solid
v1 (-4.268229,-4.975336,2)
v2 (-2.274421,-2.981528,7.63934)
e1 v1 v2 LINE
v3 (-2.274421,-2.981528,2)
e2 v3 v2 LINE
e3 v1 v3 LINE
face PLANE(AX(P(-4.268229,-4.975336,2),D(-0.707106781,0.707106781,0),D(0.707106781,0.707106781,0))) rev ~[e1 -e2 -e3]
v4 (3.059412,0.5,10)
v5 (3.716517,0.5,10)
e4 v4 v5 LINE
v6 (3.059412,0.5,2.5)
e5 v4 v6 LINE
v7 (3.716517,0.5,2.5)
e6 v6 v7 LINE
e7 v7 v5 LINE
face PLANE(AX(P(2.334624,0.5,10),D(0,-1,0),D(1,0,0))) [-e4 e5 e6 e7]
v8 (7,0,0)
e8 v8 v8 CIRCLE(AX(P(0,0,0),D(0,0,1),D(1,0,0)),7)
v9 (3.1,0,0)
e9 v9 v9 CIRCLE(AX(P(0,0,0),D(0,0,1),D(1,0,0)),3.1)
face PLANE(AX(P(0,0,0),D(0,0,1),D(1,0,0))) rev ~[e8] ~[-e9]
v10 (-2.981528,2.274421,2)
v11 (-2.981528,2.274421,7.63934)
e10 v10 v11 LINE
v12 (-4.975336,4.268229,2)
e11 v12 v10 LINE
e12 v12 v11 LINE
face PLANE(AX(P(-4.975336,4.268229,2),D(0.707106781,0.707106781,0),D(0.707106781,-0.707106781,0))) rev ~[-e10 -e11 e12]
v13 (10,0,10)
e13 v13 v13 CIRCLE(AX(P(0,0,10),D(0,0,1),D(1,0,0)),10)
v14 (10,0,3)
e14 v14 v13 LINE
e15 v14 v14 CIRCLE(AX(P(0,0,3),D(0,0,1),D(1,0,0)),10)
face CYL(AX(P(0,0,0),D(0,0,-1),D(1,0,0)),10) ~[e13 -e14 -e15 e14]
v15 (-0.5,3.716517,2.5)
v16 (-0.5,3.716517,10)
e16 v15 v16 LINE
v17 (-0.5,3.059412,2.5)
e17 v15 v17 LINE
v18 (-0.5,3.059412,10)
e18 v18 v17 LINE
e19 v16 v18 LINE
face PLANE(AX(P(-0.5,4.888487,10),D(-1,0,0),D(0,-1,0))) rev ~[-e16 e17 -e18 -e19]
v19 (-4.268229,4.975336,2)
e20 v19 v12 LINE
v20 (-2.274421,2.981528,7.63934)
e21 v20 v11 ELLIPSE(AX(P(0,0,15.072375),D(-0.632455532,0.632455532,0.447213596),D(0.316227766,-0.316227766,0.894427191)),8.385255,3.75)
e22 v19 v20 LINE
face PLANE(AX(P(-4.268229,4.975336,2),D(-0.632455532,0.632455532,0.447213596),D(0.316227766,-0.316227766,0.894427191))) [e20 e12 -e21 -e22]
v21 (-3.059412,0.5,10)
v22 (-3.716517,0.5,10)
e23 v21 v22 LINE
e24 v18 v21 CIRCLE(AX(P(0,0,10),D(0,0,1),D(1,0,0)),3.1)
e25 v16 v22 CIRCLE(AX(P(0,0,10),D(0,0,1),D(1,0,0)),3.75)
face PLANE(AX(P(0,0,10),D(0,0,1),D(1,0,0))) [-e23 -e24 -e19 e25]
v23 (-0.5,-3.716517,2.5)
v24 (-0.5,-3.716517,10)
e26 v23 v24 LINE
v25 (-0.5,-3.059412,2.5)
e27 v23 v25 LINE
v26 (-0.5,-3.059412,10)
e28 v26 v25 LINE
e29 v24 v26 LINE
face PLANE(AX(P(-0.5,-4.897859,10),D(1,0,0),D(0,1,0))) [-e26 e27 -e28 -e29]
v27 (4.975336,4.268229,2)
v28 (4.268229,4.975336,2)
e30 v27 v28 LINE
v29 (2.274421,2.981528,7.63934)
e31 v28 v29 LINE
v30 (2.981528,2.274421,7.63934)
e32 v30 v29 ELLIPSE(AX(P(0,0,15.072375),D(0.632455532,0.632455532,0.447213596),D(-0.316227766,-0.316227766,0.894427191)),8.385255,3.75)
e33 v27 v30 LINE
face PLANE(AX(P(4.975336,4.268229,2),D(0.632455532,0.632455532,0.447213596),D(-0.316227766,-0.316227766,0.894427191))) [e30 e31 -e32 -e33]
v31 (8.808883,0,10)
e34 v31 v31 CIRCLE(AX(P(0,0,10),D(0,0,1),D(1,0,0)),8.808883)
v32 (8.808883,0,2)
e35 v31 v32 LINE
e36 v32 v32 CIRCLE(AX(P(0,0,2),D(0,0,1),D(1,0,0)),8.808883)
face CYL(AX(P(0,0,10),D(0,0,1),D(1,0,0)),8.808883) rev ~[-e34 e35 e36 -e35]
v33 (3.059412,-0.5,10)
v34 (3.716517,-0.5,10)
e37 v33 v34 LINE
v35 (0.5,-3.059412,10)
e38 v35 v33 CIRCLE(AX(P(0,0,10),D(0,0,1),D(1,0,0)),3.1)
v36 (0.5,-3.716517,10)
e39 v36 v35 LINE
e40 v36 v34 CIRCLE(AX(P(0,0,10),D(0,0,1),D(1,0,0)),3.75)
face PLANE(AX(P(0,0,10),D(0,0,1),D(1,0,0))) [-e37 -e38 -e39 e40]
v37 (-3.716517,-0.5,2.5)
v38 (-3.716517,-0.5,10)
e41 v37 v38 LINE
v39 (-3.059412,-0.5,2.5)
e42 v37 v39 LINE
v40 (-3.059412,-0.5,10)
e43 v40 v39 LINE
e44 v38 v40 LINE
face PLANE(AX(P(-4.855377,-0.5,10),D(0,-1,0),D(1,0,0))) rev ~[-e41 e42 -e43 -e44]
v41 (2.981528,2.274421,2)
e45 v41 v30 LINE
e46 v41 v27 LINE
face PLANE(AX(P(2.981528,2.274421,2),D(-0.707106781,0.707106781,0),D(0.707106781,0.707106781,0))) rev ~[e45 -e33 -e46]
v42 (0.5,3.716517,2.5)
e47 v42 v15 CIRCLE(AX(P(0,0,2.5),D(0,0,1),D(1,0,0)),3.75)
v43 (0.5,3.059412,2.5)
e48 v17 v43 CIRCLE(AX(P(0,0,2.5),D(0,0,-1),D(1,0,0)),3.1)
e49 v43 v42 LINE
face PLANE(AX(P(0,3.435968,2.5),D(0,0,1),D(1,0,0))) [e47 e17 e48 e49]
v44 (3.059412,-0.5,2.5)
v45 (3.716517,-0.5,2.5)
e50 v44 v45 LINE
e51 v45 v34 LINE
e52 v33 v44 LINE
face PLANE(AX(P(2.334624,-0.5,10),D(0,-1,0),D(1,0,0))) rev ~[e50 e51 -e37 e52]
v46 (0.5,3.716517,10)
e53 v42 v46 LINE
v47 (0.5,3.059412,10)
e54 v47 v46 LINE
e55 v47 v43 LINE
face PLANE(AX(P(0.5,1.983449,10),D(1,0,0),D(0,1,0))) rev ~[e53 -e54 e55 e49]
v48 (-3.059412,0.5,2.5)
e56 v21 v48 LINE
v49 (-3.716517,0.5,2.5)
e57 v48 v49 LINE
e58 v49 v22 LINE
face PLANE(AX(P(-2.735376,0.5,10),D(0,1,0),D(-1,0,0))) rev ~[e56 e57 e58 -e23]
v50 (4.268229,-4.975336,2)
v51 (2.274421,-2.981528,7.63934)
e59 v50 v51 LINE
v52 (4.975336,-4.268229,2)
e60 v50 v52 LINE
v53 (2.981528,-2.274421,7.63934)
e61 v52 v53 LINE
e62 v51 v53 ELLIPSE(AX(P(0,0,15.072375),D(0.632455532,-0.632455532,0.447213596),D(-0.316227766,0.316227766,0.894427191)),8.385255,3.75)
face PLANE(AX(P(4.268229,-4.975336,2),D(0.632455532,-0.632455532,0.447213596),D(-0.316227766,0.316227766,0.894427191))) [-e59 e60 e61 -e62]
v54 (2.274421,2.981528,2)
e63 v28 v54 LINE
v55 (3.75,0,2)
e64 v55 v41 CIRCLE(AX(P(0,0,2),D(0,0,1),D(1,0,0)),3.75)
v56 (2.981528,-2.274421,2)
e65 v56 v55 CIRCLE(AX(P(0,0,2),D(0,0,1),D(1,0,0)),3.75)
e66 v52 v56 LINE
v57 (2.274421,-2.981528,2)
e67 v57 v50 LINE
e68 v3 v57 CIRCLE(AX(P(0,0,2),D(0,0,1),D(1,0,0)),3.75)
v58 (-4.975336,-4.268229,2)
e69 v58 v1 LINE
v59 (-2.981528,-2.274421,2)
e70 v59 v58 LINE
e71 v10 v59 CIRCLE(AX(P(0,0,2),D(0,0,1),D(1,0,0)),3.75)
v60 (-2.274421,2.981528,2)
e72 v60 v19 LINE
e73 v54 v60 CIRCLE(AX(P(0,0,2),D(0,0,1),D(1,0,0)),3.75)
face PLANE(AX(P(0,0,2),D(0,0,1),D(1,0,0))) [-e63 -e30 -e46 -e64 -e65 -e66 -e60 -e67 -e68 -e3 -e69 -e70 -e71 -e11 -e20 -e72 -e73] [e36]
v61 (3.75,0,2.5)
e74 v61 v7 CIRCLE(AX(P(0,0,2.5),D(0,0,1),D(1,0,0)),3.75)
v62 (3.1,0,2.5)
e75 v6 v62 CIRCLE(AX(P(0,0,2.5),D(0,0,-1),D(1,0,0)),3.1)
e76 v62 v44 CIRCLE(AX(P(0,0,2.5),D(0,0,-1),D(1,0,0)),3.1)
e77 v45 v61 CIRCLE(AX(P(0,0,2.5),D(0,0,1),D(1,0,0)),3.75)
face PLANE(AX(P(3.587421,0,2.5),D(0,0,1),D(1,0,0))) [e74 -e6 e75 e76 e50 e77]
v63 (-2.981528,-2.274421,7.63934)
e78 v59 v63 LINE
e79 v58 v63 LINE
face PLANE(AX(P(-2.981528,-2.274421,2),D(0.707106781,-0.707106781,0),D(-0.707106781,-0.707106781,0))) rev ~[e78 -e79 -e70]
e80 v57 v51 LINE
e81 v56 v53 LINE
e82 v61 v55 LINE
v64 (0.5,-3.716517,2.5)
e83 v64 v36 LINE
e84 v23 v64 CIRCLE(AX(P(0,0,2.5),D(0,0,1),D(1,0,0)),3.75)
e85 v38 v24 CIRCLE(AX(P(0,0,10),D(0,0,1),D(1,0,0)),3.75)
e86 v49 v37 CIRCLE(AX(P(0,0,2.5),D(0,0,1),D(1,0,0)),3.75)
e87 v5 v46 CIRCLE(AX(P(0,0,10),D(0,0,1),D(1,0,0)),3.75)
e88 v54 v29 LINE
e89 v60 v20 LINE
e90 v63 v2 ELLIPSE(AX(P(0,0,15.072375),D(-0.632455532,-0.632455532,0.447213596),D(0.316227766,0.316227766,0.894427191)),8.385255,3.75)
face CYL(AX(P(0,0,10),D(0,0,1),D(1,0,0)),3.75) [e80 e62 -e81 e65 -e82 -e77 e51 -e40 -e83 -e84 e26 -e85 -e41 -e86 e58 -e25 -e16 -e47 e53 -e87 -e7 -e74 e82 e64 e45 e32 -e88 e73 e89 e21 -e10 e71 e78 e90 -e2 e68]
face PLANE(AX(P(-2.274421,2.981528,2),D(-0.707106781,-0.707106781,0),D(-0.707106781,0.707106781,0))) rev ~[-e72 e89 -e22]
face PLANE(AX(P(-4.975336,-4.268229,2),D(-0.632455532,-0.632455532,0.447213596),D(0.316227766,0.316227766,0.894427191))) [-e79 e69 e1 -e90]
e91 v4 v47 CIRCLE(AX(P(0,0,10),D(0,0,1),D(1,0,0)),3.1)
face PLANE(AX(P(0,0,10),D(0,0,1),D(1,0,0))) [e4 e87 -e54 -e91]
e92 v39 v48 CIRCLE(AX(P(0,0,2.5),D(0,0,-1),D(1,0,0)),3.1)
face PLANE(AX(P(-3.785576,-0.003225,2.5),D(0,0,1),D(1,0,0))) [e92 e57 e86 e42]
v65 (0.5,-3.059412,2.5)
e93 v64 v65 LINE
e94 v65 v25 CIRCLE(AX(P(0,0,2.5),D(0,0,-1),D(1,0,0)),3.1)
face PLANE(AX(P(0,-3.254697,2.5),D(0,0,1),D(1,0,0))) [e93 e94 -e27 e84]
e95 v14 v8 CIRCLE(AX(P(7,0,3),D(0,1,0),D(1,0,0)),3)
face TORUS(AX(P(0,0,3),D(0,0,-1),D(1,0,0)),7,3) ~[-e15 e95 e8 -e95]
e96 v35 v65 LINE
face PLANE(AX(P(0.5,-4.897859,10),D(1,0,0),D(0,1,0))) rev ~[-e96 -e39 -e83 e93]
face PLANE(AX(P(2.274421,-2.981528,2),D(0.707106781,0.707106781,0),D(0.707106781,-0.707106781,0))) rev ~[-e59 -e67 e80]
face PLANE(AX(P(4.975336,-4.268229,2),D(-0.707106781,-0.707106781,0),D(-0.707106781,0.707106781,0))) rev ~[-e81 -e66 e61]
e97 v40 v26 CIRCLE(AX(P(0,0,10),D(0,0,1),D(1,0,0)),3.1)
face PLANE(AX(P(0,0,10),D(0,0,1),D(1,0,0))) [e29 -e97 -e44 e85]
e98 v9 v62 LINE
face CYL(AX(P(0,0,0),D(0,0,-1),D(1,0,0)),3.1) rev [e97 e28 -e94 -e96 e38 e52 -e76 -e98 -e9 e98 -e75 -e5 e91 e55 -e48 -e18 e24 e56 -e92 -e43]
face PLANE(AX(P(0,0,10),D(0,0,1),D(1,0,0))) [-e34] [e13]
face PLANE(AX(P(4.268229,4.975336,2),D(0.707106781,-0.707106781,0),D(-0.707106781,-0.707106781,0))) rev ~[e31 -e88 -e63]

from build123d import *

# Parameters (mm, degrees)
F0_R         = 10
F0_R_2       = 3.1
F1_DEPTH     = 10
F2_R         = 8.8088832383
F2_R_2       = 3.75
F3_DEPTH     = 8
F4_W         = 1
F4_H         = 3.2863240922
F4_W_2       = 2.5055953301
F4_H_2       = 1
F5_DEPTH     = 7.5
F6_R         = 3
F8_DEPTH     = 6
F9_T4_DEPTH  = 1
F9_S5_R      = 3.75
F9_T6_DEPTH  = 5
F9_T10_DEPTH = 1
F9_S11_R     = 3.75
F9_T12_DEPTH = 5
F9_T16_DEPTH = 1
F9_S17_R     = 3.75
F9_T18_DEPTH = 5
F9_T22_DEPTH = 1
F9_S23_R     = 3.75
F9_T24_DEPTH = 5


# Not quite as in the source:
# - a fillet or chamfer that OpenCascade refuses, or shapes differently, is made with other operations: its cross-section is extruded or revolved along the edge and cut away or added
# - two fillets or chamfers of one size are made in one step


with BuildPart() as f1:
    # F0 (on Top) → F1 (new body)
    with BuildSketch(Plane.XY):
        Circle(F0_R)
        Circle(F0_R_2, mode=Mode.SUBTRACT)
    extrude(amount=F1_DEPTH)

    # F2 (on face) → F3 (cut)
    with BuildSketch(Plane.XY.offset(10)):
        Circle(F2_R)
        Circle(F2_R_2, mode=Mode.SUBTRACT)
    extrude(amount=-F3_DEPTH, mode=Mode.SUBTRACT)

    # F4 (on face) → F5 (cut)
    with BuildSketch(Plane.XY.offset(10)):
        Polygon((-2.7353764913, 0.5), (-4.8153767841, 0.5), (-4.8553765493, -0.5), (-2.7353764913, -0.5), align=None)
        Polygon((-0.5, 4.8884870484), (-0.5, 4.6887658536), (-0.5, 1.9834490959), (0.5, 1.9834490959), (0.5, 4.8884870484), align=None)
        with Locations((0, -3.2546973671)):
            Rectangle(F4_W, F4_H)
        with Locations((3.5874212626, 0)):
            Rectangle(F4_W_2, F4_H_2)
    extrude(amount=-F5_DEPTH, mode=Mode.SUBTRACT)

    # F6
    f6_edges = [f1.edges().sort_by_distance(p)[0] for p in [
        (-10, 0, 0),
    ]]
    fillet(f6_edges, radius=F6_R)

    # F7 (on face) → F8 (join)
    with BuildSketch(Plane.XY.offset(2)):
        Polygon((-4.9753358018, 4.2682290206), (-2.9815278958, 2.2744211146), (-2.2744211146, 2.9815278958), (-4.2682290206, 4.9753358018), align=None)
        Polygon((2.2744211146, 2.9815278958), (2.9815278958, 2.2744211146), (4.9753358018, 4.2682290206), (4.2682290206, 4.9753358018), align=None)
        Polygon((-2.2744211146, -2.9815278958), (-2.9815278958, -2.2744211146), (-4.9753358018, -4.2682290206), (-4.2682290206, -4.9753358018), align=None)
        Polygon((2.9815278958, -2.2744211146), (2.2744211146, -2.9815278958), (4.2682290206, -4.9753358018), (4.9753358018, -4.2682290206), align=None)
    extrude(amount=F8_DEPTH)

    # F9: chamfer of 6 x 3 on 4 edges, made by hand


with BuildPart() as f9_tool2:
    # F9_s3 → F9_t4 (new body)
    with BuildSketch(Plane(origin=(0.3535533906, 0.3535533906, 0), x_dir=(0, 0, 1), z_dir=(-0.7071067812, -0.7071067812, 0))):
        Polygon((2, 6.5361873683), (8, 3.5361873683), (8, 6.5361873683), align=None)
    extrude(amount=F9_T4_DEPTH)

    # F9_s5 → F9_t6 (cut, symmetric)
    with BuildSketch(Plane.XY.offset(5)):
        Circle(F9_S5_R)
    extrude(amount=F9_T6_DEPTH, both=True, mode=Mode.SUBTRACT)


with BuildPart() as f1_1:
    add(f1.part)

    # F9_t1: cut F9_tool2
    add(f9_tool2.part, mode=Mode.SUBTRACT)


with BuildPart() as f9_tool8:
    # F9_s9 → F9_t10 (new body)
    with BuildSketch(Plane(origin=(-0.3535533906, -0.3535533906, 0), x_dir=(0, 0, 1), z_dir=(0.7071067812, 0.7071067812, 0))):
        Polygon((2, 6.5361873683), (8, 3.5361873683), (8, 6.5361873683), align=None)
    extrude(amount=F9_T10_DEPTH)

    # F9_s11 → F9_t12 (cut, symmetric)
    with BuildSketch(Plane.XY.offset(5)):
        Circle(F9_S11_R)
    extrude(amount=F9_T12_DEPTH, both=True, mode=Mode.SUBTRACT)


with BuildPart() as f1_2:
    add(f1_1.part)

    # F9_t7: cut F9_tool8
    add(f9_tool8.part, mode=Mode.SUBTRACT)


with BuildPart() as f9_tool14:
    # F9_s15 → F9_t16 (new body)
    with BuildSketch(Plane(origin=(0.3535533906, -0.3535533906, 0), x_dir=(0, 0, 1), z_dir=(-0.7071067812, 0.7071067812, 0))):
        Polygon((2, 6.5361873683), (8, 3.5361873683), (8, 6.5361873683), align=None)
    extrude(amount=F9_T16_DEPTH)

    # F9_s17 → F9_t18 (cut, symmetric)
    with BuildSketch(Plane.XY.offset(5)):
        Circle(F9_S17_R)
    extrude(amount=F9_T18_DEPTH, both=True, mode=Mode.SUBTRACT)


with BuildPart() as f1_3:
    add(f1_2.part)

    # F9_t13: cut F9_tool14
    add(f9_tool14.part, mode=Mode.SUBTRACT)


with BuildPart() as f9_tool20:
    # F9_s21 → F9_t22 (new body)
    with BuildSketch(Plane(origin=(-0.3535533906, 0.3535533906, 0), x_dir=(0, 0, 1), z_dir=(0.7071067812, -0.7071067812, 0))):
        Polygon((2, 6.5361873683), (8, 3.5361873683), (8, 6.5361873683), align=None)
    extrude(amount=F9_T22_DEPTH)

    # F9_s23 → F9_t24 (cut, symmetric)
    with BuildSketch(Plane.XY.offset(5)):
        Circle(F9_S23_R)
    extrude(amount=F9_T24_DEPTH, both=True, mode=Mode.SUBTRACT)


with BuildPart() as f1_4:
    add(f1_3.part)

    # F9_t19: cut F9_tool20
    add(f9_tool20.part, mode=Mode.SUBTRACT)


solid = f1_4.part
